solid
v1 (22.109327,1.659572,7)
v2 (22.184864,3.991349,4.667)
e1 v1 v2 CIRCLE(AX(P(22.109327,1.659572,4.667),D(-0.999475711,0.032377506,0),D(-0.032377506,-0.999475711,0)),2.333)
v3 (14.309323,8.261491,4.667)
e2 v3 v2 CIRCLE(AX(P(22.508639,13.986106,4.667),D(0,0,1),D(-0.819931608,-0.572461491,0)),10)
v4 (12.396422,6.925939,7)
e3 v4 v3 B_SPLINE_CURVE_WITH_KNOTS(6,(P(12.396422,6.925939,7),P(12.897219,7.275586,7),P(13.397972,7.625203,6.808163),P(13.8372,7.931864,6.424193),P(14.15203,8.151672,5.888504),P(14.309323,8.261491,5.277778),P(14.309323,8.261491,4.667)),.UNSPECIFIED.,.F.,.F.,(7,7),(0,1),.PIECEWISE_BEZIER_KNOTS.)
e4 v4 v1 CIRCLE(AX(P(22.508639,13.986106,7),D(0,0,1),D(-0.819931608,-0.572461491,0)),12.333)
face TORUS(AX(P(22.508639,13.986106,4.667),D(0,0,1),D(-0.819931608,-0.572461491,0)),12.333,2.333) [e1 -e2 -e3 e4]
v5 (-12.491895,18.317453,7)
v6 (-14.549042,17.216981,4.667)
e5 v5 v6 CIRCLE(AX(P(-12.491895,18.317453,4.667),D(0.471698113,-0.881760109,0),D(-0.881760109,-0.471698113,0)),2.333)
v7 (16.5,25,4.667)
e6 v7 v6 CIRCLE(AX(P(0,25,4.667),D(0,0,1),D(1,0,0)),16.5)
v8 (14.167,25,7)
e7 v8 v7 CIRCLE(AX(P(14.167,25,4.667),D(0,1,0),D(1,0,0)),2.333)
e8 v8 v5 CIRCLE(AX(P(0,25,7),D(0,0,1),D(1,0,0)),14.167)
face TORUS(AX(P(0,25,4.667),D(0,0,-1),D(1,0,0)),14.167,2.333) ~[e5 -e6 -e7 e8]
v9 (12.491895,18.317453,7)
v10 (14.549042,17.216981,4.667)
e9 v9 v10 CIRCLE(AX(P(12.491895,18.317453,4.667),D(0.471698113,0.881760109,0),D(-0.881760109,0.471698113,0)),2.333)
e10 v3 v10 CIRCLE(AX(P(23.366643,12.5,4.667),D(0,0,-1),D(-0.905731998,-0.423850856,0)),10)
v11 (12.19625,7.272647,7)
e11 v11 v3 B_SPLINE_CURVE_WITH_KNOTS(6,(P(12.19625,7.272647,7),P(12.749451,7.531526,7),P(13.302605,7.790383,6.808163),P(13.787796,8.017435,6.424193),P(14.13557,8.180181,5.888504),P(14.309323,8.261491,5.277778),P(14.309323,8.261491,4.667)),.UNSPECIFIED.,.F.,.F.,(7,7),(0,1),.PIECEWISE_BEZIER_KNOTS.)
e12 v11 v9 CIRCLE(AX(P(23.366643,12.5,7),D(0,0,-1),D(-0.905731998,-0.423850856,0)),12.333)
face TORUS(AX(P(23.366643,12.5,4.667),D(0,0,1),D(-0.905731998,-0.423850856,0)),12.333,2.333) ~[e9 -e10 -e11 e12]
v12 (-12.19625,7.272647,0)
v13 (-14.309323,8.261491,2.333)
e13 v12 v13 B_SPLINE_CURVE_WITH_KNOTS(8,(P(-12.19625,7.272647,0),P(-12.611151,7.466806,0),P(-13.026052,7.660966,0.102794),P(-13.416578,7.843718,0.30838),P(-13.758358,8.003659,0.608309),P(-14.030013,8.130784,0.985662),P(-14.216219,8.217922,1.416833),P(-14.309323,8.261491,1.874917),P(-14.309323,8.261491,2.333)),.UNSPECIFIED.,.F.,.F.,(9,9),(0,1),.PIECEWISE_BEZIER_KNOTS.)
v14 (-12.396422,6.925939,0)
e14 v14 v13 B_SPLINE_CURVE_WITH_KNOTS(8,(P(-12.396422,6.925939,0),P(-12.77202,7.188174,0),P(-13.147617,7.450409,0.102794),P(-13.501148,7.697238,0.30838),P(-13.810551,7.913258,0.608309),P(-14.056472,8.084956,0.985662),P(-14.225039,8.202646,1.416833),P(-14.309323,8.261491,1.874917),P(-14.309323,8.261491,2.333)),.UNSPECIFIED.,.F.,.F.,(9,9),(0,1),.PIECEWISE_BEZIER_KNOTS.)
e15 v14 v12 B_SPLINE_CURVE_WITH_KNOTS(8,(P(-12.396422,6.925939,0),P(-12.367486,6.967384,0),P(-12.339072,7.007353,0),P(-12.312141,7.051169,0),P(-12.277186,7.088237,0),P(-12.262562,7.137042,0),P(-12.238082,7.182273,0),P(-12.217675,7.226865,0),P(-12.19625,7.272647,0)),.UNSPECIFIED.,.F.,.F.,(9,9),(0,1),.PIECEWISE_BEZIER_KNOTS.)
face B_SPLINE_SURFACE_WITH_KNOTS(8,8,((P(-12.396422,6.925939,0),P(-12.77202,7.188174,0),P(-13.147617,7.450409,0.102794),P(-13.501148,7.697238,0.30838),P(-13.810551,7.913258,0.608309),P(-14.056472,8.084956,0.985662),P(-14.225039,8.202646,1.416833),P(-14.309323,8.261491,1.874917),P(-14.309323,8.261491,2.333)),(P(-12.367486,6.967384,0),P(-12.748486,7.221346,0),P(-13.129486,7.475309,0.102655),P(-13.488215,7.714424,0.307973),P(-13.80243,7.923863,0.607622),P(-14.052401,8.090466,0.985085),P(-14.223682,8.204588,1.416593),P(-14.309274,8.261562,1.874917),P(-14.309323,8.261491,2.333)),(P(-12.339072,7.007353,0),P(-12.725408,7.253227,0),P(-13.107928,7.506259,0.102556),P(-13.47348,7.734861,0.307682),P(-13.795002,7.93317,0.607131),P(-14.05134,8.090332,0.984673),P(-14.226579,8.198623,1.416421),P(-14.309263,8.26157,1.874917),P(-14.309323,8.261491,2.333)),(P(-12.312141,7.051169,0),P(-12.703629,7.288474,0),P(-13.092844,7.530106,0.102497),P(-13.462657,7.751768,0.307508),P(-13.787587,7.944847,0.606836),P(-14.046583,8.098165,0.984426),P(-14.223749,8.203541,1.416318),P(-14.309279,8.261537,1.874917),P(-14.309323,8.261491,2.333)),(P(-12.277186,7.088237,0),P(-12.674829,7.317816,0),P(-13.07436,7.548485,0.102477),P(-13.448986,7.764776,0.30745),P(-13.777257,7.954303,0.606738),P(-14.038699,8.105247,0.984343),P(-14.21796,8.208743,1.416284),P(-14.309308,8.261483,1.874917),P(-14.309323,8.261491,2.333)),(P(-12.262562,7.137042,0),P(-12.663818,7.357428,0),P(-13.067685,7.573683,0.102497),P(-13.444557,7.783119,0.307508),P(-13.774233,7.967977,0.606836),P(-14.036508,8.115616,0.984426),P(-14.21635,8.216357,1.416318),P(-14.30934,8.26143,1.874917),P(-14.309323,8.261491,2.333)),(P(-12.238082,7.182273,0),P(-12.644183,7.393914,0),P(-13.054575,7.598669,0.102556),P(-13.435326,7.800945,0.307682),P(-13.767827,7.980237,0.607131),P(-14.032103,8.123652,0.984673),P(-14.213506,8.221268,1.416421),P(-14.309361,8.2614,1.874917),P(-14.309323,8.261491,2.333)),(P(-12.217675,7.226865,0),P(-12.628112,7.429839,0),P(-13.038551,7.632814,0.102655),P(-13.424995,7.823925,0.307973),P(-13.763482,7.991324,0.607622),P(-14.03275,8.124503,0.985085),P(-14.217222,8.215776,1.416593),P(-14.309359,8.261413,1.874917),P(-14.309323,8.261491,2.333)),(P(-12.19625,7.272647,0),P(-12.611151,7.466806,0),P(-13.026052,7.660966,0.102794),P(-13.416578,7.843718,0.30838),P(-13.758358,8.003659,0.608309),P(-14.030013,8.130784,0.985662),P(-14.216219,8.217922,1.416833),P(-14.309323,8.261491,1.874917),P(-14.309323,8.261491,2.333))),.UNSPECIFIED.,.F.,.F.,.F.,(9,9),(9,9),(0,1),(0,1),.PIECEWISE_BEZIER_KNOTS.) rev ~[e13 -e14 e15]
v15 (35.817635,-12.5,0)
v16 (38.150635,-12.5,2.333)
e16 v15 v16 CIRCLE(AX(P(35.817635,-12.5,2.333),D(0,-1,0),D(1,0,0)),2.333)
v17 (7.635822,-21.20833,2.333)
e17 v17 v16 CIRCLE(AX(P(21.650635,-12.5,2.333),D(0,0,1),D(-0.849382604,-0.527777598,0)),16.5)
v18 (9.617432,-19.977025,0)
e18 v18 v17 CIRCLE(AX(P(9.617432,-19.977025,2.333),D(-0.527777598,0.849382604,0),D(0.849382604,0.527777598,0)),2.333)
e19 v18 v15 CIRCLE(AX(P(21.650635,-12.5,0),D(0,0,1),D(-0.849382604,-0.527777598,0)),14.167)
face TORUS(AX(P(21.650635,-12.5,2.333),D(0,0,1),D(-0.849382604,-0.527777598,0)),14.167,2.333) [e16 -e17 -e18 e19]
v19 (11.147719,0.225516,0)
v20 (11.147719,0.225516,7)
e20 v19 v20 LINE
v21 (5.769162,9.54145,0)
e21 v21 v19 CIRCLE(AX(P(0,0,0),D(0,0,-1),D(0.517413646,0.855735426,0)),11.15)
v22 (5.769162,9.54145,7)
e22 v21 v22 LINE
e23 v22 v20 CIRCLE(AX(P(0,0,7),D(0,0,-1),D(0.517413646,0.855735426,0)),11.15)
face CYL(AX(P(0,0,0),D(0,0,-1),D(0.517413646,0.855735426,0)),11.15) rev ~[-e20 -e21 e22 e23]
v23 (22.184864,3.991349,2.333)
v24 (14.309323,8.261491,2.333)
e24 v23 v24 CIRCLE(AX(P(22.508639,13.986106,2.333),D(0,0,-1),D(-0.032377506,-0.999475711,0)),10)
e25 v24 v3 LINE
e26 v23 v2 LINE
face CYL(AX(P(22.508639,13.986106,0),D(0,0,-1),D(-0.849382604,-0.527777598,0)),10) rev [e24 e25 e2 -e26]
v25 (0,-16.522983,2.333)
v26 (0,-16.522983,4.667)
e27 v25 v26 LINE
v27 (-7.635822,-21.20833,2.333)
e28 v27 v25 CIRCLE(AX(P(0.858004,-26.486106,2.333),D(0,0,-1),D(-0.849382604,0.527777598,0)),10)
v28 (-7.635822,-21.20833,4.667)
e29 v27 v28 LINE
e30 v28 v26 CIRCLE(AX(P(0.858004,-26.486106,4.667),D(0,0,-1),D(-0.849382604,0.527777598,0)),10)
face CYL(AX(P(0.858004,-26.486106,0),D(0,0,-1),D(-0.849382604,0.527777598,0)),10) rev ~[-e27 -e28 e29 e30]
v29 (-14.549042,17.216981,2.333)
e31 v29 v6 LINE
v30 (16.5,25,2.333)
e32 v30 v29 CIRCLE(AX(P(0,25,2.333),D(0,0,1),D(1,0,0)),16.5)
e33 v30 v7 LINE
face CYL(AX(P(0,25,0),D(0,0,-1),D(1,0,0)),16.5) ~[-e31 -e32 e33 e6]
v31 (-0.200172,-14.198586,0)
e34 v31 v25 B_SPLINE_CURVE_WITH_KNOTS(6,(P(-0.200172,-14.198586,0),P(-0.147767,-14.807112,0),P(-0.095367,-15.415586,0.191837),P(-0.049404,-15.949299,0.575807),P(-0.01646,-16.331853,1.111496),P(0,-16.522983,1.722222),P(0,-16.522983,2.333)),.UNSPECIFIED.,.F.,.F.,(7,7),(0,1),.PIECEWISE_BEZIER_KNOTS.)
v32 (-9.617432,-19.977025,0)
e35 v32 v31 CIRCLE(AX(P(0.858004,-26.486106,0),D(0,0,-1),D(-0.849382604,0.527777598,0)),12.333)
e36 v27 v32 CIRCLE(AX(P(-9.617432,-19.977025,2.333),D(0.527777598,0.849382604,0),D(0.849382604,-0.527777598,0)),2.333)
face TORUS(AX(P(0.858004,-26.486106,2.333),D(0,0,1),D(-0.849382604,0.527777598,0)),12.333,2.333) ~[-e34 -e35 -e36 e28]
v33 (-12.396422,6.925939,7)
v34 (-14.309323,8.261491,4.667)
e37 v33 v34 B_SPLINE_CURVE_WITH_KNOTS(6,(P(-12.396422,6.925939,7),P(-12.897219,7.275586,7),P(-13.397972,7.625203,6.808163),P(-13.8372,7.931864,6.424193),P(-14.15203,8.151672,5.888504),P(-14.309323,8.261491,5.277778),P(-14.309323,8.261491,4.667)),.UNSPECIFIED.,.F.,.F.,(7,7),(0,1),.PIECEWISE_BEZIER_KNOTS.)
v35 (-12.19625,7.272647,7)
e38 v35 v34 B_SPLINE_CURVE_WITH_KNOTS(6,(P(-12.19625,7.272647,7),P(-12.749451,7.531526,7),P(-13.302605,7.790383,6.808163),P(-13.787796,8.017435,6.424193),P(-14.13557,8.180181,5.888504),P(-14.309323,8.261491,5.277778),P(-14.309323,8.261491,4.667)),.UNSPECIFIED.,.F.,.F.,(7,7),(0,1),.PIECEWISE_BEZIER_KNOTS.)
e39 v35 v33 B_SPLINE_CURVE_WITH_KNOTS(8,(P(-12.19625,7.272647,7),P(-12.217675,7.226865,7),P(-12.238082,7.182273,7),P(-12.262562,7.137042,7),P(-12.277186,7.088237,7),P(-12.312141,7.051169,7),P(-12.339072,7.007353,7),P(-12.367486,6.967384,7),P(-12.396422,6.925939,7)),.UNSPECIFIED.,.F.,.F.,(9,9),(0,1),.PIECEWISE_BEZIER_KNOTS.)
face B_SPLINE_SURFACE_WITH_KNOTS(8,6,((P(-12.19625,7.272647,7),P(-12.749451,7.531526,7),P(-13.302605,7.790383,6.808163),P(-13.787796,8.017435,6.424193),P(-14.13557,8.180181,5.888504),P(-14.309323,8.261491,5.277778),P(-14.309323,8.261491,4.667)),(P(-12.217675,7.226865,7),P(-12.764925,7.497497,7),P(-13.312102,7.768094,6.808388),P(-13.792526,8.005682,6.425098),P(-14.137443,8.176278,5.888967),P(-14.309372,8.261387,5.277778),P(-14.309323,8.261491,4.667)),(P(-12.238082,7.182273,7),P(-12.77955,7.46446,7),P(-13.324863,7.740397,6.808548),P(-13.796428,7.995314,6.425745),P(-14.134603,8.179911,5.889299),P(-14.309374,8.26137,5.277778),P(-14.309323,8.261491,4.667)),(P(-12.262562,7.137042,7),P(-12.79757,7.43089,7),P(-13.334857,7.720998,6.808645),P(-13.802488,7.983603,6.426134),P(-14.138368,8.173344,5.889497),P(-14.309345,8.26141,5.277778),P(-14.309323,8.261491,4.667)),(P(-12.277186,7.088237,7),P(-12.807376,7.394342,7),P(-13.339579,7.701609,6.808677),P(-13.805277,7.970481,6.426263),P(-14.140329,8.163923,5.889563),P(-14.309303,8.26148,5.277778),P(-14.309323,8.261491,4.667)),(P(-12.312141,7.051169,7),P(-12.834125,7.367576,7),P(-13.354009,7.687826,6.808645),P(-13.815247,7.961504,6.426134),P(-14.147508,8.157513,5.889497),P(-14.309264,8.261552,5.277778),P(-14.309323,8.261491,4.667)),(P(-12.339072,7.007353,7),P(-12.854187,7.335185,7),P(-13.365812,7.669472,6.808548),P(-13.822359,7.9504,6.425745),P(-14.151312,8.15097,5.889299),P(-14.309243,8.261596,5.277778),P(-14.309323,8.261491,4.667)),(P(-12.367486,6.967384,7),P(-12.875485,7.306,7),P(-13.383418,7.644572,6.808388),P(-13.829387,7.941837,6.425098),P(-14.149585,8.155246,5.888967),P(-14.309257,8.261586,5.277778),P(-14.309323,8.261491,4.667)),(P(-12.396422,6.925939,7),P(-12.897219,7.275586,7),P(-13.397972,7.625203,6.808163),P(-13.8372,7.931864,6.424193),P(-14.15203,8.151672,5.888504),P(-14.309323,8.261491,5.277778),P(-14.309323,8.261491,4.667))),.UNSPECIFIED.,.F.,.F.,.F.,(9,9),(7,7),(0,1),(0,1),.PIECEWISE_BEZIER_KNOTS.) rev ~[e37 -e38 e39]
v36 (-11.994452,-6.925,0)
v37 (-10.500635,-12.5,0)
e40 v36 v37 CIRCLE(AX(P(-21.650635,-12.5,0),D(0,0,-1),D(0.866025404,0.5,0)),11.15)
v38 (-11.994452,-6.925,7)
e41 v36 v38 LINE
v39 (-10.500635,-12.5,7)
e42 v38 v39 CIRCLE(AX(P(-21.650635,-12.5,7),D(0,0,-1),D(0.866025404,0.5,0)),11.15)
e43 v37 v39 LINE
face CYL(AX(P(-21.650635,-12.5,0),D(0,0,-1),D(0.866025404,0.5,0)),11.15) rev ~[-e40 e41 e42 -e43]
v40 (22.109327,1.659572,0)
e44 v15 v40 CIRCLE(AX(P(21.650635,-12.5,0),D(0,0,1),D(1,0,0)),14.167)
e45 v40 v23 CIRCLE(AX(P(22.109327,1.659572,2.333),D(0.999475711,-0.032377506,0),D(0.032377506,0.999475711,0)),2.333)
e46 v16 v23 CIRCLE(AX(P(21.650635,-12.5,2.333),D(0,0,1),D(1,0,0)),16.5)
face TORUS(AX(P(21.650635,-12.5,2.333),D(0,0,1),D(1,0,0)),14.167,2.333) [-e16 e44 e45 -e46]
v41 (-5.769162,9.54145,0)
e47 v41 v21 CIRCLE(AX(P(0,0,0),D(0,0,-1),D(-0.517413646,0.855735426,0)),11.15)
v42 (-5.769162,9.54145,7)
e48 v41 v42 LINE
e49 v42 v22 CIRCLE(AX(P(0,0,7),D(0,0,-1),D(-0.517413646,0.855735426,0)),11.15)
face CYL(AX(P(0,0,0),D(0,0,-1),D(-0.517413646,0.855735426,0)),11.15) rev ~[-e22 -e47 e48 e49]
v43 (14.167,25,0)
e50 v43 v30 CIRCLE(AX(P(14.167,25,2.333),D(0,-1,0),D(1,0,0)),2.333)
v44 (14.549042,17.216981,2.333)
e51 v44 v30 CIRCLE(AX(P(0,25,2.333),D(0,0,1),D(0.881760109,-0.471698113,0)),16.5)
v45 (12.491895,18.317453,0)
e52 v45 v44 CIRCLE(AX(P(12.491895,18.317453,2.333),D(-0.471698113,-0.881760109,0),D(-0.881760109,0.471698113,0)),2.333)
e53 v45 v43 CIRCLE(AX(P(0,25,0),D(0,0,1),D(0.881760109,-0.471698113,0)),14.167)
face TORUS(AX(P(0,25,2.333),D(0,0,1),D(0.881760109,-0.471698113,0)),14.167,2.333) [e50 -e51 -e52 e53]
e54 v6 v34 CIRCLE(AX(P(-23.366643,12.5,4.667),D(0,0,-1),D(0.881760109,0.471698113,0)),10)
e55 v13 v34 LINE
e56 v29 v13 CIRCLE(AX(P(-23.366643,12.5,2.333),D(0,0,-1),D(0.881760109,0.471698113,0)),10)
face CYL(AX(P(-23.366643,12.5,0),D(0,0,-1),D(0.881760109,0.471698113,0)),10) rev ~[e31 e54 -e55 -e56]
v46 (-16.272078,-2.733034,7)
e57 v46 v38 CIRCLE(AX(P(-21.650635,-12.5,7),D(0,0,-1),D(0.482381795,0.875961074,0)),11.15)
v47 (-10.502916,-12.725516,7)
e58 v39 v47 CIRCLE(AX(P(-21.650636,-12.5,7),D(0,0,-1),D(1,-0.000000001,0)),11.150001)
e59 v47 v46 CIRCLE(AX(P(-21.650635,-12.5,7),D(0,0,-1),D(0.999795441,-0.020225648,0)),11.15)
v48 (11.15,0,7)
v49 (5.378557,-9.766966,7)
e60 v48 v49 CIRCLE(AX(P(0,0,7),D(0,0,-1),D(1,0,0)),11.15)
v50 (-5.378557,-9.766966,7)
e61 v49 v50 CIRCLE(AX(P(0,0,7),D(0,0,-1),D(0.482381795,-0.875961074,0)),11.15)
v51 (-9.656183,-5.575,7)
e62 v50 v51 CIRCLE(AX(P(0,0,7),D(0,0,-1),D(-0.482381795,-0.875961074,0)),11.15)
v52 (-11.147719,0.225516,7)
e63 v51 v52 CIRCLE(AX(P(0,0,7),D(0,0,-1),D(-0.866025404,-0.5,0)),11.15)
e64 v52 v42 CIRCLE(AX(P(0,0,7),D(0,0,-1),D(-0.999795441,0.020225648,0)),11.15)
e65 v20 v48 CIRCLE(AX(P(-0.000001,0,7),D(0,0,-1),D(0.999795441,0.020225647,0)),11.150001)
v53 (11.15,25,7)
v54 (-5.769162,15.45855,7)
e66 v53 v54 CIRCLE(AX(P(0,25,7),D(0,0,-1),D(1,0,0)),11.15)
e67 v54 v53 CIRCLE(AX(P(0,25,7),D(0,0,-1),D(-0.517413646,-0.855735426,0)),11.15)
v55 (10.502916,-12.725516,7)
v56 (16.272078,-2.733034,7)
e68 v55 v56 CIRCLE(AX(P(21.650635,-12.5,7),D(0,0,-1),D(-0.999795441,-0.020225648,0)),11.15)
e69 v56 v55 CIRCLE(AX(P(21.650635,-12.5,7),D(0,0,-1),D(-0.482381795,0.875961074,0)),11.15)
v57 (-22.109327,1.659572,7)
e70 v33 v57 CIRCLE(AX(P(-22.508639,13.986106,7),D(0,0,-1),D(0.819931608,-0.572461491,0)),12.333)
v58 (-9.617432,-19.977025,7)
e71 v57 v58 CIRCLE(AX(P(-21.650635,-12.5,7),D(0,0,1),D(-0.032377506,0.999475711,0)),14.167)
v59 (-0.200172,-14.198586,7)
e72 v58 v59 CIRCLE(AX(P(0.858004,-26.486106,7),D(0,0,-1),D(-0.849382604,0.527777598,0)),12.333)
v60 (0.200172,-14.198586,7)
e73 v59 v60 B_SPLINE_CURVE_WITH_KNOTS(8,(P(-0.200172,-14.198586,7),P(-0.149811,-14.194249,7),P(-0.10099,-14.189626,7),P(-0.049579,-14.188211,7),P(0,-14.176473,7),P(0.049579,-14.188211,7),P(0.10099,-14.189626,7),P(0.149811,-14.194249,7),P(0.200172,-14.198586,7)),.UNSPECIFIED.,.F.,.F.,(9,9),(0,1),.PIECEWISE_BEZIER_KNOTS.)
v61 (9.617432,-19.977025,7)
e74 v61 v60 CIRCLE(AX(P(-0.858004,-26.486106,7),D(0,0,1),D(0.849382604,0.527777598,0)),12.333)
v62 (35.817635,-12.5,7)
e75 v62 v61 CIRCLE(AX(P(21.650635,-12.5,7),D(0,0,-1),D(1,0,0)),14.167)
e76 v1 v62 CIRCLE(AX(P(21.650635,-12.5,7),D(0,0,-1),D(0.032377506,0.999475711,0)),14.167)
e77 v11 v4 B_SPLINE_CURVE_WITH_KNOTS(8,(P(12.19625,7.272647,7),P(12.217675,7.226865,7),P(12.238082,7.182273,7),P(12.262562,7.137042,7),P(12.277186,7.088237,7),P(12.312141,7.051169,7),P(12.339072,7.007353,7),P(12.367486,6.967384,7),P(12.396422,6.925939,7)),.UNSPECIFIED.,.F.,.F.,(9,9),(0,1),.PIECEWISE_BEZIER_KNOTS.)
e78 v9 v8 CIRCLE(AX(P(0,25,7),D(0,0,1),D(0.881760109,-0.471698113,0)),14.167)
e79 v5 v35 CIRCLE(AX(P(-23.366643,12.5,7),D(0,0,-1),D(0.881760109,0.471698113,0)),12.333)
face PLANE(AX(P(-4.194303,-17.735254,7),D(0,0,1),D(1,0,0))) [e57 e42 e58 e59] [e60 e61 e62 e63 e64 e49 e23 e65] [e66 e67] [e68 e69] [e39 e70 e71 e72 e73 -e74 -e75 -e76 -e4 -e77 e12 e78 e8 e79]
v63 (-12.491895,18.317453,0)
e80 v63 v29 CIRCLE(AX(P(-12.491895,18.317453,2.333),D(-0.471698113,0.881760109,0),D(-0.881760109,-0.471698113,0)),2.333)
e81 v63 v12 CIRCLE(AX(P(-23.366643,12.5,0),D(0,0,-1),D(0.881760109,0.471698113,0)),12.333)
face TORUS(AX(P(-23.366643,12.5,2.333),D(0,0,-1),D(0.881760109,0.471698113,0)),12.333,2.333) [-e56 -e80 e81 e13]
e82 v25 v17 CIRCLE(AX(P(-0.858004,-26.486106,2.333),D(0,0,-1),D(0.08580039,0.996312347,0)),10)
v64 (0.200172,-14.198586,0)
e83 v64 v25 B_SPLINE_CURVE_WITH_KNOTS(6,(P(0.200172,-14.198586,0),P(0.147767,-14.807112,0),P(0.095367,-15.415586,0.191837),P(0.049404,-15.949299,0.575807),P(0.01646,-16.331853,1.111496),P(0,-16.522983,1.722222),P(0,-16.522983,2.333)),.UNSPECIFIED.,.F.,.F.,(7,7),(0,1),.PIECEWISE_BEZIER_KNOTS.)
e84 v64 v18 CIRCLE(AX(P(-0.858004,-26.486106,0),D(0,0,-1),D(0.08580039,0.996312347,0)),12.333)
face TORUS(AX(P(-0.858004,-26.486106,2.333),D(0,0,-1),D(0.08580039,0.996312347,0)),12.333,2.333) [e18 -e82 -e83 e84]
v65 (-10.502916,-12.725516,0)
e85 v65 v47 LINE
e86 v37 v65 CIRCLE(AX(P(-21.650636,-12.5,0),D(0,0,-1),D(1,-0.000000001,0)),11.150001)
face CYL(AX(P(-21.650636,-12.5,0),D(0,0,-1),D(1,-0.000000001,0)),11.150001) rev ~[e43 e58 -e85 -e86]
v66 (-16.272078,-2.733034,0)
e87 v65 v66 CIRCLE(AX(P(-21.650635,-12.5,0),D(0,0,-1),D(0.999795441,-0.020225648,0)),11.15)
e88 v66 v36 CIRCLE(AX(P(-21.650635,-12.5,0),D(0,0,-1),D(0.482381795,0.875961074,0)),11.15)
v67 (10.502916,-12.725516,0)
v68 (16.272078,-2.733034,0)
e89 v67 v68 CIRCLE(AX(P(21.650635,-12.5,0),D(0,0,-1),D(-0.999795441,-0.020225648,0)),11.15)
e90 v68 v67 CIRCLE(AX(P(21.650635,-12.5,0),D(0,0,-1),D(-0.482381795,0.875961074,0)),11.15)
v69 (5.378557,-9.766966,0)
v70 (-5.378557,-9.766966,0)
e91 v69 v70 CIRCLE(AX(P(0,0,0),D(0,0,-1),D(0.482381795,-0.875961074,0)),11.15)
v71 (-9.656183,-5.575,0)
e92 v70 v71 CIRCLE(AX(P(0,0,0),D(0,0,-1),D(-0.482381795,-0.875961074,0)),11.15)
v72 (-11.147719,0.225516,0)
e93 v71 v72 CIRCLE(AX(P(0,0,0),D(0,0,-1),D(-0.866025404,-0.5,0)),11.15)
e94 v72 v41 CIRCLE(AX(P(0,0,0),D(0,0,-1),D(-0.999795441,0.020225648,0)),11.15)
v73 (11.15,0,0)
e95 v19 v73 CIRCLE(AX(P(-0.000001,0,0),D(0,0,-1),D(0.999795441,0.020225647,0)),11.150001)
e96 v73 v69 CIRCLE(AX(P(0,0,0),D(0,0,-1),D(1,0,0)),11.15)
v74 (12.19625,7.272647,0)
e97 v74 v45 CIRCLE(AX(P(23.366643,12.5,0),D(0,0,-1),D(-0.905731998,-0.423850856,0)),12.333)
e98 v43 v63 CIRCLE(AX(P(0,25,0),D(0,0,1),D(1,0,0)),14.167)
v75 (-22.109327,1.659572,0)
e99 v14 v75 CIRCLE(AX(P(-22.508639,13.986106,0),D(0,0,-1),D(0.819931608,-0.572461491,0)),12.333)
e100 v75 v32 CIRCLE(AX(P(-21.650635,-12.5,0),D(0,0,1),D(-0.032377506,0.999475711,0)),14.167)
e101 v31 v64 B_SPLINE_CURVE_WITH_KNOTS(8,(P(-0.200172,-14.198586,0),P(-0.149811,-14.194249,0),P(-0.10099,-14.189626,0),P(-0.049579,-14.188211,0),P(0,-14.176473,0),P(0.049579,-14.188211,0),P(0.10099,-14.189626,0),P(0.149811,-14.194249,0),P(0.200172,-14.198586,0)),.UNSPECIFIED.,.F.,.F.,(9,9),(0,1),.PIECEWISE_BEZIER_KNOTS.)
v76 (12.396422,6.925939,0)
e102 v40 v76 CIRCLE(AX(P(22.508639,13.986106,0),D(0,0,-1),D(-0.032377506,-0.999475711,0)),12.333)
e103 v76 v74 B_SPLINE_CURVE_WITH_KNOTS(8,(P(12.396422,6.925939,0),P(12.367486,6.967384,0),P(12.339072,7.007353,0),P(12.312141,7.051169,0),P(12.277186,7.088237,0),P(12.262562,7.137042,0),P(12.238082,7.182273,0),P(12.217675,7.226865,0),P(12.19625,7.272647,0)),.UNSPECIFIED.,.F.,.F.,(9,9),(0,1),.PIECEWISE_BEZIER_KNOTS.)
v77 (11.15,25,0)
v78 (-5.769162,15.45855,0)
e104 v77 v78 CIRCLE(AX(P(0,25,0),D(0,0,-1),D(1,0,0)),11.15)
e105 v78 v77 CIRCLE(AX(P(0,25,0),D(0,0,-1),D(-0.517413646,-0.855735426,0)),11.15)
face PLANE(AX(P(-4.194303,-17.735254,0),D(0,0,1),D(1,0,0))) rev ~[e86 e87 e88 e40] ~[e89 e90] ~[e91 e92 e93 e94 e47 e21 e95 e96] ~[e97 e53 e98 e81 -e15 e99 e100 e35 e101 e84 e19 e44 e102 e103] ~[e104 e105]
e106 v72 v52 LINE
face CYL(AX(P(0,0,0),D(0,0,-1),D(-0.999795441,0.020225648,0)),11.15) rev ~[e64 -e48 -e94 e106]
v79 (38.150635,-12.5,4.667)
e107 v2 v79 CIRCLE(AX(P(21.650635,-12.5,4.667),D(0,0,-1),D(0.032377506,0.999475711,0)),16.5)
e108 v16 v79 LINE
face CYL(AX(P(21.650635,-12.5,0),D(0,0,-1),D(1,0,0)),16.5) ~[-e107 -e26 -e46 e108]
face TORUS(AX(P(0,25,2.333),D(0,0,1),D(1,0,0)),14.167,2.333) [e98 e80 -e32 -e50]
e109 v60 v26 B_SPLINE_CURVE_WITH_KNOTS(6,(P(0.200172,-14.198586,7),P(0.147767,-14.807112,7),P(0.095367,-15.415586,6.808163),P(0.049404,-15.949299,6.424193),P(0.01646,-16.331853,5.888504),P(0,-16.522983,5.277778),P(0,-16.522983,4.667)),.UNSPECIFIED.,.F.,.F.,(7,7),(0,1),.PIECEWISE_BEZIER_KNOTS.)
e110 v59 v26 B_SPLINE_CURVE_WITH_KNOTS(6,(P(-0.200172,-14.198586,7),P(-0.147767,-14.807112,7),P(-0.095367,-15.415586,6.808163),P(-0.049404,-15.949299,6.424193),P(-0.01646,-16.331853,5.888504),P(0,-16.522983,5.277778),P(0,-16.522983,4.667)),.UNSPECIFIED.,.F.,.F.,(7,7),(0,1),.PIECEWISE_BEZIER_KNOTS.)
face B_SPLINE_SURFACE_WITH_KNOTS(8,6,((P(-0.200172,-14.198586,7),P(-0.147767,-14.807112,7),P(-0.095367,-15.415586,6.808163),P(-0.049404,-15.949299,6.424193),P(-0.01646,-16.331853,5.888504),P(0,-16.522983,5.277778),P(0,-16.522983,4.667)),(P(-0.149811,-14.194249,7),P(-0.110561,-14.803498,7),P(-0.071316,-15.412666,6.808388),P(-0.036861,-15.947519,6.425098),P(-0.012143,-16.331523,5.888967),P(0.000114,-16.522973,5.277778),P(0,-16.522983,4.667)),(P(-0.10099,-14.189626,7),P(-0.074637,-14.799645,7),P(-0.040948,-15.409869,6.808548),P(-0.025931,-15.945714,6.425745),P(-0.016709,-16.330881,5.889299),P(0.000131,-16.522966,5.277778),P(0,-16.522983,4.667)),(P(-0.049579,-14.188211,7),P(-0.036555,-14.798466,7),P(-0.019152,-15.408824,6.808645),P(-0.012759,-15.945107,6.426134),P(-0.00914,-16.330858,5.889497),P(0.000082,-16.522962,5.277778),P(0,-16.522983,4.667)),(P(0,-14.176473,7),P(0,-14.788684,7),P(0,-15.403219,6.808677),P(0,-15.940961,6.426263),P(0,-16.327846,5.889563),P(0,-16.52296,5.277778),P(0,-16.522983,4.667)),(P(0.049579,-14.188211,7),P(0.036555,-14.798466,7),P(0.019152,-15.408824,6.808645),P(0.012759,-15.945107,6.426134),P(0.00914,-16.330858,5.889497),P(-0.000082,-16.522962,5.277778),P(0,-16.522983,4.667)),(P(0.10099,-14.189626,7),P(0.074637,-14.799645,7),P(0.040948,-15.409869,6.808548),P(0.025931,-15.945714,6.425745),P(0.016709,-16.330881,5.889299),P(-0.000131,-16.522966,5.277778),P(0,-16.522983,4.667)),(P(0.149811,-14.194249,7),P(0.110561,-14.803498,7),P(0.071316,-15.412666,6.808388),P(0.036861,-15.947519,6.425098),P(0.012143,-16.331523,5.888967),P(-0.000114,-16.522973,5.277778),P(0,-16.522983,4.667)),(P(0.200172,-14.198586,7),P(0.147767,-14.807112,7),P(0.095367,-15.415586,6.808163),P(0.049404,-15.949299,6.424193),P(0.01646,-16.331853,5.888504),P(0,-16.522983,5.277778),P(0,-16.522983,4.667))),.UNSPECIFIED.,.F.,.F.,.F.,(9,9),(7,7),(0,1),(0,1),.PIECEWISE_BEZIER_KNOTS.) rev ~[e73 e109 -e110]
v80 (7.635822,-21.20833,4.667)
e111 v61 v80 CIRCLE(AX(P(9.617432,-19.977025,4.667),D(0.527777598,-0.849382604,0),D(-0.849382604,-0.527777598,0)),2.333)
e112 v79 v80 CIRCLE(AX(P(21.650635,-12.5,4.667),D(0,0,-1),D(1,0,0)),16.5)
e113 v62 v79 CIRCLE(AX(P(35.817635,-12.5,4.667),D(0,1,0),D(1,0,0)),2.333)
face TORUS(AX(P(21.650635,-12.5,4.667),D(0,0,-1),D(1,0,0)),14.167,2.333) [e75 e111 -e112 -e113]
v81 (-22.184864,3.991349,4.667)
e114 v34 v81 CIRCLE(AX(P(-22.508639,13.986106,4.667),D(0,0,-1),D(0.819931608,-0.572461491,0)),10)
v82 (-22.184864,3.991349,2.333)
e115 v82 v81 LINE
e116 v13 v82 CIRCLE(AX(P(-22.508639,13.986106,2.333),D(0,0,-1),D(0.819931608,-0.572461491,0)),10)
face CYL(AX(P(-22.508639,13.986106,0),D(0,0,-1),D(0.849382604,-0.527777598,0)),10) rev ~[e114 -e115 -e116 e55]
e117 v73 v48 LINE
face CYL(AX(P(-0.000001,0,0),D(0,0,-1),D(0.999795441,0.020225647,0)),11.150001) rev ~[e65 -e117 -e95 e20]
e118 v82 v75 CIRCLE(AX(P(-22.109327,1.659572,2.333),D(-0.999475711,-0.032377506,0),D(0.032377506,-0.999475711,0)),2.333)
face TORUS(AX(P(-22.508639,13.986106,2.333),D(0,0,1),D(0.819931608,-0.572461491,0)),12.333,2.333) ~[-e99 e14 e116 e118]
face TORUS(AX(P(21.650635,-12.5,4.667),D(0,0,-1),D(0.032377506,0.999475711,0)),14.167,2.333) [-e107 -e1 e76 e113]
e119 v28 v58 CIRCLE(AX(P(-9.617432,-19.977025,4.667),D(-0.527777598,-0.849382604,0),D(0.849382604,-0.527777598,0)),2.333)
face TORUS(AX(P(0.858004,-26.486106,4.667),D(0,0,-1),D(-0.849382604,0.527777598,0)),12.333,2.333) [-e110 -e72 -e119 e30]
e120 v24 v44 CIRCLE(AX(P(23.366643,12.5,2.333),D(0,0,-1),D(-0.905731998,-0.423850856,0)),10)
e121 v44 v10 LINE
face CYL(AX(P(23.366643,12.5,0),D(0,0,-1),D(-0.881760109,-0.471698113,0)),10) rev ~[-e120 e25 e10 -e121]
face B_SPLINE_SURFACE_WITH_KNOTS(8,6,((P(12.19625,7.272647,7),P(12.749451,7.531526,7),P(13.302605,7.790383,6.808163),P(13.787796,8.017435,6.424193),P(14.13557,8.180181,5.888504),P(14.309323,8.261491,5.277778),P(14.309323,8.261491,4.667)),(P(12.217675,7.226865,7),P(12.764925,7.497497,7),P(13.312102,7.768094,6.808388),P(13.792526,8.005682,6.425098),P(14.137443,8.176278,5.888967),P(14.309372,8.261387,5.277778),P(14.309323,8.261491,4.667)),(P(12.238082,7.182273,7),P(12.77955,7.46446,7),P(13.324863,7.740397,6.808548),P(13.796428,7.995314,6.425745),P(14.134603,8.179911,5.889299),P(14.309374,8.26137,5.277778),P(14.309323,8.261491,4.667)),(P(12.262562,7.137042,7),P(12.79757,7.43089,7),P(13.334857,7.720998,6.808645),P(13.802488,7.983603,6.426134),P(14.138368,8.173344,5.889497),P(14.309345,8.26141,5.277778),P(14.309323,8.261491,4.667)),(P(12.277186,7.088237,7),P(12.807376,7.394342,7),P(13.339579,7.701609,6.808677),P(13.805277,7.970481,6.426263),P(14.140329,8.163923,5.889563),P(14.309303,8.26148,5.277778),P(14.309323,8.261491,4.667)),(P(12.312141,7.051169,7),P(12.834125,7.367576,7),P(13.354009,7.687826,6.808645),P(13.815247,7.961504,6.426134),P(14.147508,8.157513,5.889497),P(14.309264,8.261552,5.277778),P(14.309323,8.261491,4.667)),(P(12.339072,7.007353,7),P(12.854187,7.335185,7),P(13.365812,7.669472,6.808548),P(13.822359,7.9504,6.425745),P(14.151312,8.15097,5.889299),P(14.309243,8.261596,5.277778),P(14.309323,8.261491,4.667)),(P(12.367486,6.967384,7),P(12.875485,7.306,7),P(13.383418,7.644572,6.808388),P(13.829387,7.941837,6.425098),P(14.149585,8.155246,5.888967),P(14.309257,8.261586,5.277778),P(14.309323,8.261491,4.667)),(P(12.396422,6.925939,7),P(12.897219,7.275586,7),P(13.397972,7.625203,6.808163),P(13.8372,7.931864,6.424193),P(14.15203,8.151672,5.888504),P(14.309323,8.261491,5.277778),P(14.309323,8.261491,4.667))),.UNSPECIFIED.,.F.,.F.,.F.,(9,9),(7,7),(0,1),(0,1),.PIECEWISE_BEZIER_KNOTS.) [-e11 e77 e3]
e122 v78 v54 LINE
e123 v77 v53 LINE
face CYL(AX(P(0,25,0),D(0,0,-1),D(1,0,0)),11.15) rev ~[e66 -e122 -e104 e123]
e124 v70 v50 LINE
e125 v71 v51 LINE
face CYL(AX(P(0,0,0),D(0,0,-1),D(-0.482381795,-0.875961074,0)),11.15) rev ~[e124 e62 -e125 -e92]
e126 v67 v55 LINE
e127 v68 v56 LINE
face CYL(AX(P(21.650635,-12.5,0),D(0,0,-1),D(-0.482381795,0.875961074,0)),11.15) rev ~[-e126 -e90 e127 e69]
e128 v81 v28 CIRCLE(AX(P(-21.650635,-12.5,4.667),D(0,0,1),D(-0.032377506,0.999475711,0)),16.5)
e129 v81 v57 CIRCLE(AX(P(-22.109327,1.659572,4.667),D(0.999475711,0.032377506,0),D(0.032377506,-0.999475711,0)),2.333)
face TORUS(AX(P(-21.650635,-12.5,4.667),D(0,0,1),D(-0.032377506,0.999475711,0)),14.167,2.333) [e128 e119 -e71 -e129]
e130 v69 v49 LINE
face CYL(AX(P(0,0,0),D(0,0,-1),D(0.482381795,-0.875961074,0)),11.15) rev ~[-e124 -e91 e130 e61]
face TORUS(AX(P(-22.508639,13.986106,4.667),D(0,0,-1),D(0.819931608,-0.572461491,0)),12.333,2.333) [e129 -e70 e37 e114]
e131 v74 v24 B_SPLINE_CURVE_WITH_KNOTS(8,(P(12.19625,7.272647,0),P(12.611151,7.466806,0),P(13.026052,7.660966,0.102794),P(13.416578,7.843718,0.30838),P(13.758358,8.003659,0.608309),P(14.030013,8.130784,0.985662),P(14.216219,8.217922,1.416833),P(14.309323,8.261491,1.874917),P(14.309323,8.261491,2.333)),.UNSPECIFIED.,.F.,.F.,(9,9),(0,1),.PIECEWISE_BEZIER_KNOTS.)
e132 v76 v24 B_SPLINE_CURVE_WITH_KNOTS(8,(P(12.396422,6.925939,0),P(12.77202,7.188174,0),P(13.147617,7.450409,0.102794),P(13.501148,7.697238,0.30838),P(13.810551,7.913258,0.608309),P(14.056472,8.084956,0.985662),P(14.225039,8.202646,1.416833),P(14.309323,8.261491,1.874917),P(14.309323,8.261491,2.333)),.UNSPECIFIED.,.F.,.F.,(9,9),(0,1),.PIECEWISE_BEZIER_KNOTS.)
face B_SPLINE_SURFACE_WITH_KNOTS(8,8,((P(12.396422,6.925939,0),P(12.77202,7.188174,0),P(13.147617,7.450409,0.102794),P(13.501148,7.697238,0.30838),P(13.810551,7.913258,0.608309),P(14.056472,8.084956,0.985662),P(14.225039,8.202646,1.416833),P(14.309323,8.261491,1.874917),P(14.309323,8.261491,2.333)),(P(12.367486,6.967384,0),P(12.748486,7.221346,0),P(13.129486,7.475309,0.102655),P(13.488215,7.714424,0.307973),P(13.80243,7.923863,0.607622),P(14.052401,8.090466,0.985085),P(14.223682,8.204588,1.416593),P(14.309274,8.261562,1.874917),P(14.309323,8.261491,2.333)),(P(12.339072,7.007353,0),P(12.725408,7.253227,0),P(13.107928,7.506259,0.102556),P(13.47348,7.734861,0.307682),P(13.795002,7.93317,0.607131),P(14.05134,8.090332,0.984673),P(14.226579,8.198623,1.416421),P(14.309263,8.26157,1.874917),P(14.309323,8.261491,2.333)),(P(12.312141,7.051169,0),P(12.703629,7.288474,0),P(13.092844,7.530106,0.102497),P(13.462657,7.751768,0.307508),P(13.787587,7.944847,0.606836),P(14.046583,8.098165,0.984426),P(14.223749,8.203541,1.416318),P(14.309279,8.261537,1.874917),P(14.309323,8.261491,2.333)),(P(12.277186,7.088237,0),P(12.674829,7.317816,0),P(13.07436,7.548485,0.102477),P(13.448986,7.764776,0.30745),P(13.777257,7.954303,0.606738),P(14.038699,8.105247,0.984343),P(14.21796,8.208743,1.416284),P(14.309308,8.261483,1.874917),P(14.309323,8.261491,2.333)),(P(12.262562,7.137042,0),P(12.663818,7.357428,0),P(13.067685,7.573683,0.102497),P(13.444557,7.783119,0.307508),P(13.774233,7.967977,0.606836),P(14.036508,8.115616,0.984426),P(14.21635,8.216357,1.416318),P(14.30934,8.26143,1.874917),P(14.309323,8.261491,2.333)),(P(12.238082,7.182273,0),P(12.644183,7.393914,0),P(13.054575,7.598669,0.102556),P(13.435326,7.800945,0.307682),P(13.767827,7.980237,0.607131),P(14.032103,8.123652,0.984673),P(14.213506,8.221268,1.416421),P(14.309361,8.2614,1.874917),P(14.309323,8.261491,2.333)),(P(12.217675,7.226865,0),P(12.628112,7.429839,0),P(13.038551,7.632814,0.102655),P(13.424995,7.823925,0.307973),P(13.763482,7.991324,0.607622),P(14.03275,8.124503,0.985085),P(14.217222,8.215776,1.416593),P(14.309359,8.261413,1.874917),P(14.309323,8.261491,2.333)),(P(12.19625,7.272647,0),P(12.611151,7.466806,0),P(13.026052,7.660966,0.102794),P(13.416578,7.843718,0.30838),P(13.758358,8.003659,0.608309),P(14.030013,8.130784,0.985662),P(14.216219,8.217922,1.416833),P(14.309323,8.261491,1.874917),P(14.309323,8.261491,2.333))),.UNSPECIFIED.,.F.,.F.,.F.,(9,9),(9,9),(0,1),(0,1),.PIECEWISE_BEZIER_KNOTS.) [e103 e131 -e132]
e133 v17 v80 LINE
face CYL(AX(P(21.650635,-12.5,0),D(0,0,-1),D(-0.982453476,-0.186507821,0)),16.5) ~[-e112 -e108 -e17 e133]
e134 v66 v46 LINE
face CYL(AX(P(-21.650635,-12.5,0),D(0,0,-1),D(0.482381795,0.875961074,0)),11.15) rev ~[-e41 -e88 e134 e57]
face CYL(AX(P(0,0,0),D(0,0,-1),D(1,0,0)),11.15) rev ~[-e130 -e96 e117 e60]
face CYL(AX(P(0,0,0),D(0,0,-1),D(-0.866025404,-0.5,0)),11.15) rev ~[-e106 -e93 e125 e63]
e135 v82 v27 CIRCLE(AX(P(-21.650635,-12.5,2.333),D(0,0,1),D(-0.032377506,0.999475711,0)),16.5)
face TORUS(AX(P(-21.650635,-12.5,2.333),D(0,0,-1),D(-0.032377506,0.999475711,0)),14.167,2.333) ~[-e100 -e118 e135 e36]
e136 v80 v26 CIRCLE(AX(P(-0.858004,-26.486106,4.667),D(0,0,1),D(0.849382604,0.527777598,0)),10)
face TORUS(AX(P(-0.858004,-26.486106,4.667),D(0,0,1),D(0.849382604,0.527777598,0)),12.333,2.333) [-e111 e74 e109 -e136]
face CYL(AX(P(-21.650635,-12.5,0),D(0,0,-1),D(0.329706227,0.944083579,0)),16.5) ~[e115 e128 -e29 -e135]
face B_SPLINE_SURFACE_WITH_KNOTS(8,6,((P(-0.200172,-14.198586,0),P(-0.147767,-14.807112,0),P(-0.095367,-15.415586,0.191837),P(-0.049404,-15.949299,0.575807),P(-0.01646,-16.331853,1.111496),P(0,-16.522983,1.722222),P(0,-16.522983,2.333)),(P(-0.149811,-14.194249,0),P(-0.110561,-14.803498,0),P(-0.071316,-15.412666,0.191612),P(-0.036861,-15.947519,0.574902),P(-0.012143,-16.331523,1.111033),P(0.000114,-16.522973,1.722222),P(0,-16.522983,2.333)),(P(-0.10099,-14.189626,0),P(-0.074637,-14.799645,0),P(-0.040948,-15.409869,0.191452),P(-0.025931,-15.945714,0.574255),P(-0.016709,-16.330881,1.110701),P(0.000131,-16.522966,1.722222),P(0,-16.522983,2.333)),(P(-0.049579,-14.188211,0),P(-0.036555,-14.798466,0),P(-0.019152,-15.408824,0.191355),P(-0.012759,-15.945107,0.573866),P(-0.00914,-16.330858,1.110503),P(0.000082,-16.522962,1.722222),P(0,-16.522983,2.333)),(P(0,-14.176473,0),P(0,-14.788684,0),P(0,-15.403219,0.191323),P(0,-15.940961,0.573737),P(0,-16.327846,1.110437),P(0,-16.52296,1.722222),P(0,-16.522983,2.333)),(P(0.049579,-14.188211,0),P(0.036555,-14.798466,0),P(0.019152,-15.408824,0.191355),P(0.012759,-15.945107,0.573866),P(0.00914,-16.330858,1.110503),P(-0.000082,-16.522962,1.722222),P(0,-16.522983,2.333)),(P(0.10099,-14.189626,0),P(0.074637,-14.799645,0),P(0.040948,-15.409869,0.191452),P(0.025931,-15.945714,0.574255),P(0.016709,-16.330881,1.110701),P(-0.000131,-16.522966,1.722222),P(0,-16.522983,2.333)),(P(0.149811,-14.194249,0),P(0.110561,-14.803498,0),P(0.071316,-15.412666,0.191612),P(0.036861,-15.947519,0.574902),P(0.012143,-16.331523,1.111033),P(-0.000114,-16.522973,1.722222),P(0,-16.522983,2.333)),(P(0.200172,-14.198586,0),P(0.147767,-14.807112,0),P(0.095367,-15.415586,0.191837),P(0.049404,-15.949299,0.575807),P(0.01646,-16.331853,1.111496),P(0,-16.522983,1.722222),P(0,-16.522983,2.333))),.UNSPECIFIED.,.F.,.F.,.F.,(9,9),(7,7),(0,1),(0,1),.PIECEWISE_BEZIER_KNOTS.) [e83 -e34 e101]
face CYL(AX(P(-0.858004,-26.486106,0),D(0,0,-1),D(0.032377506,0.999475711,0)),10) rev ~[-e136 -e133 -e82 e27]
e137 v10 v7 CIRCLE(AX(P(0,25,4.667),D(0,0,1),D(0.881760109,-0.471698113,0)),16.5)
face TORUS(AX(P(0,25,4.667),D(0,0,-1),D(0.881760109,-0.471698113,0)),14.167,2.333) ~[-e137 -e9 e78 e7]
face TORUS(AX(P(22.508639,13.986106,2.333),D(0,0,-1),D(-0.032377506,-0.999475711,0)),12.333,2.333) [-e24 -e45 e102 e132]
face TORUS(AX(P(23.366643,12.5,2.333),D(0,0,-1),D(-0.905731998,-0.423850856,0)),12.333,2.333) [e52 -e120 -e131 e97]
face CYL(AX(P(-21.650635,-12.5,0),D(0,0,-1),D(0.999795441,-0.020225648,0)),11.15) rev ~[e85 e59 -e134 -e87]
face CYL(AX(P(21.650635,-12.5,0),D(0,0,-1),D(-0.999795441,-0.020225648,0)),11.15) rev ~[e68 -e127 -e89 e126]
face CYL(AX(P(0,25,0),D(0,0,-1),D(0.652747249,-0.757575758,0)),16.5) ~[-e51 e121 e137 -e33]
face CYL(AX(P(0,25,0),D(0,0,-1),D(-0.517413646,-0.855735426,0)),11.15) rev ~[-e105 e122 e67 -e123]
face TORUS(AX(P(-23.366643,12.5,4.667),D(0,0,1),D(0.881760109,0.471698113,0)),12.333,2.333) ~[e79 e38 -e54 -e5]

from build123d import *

# Parameters (mm, degrees)
F1_DEPTH    = 7
F2_T1_DEPTH = 7
F3_R        = 2.333


# Not quite as in the source:
# - a fillet or chamfer that OpenCascade refuses, or shapes differently, is made with other operations: its cross-section is extruded or revolved along the edge and cut away or added


with BuildPart() as f1:
    # F0 (on Top) → F1 (new body)
    with BuildSketch(Plane.XY):
        with BuildLine():
            ThreePointArc((11.1477191633, 0.2255159793), (11.1494297762, 0.1127637565), (11.15, 0))
            ThreePointArc((11.15, 0), (9.5993075457, -5.6723711659), (5.3785570146, -9.7669659793))
            ThreePointArc((5.3785570146, -9.7669659793), (5.1515621474, -12.6749053564), (5.4401527402, -15.5773790531))
            ThreePointArc((5.4401527402, -15.5773790531), (8.0980639917, -14.3760689893), (10.5029159313, -12.7255159793))
            ThreePointArc((10.5029159313, -12.7255159793), (11.9944518424, -6.925), (16.27207808, -2.7330340207))
            ThreePointArc((16.27207808, -2.7330340207), (16.4429207916, -1.3712606754), (16.5, 0))
            ThreePointArc((16.5, 0), (16.4274611375, 1.5454839293), (16.2104823544, 3.0773790531))
            ThreePointArc((16.2104823544, 3.0773790531), (13.5525711029, 1.8760689893), (11.1477191633, 0.2255159793))
        make_face()
        with BuildLine():
            ThreePointArc((5.7691621487, 9.54145), (9.6561832522, 5.575), (11.1477191633, 0.2255159793))
            ThreePointArc((11.1477191633, 0.2255159793), (13.5525711029, 1.8760689893), (16.2104823544, 3.0773790531))
            ThreePointArc((16.2104823544, 3.0773790531), (14.2894191624, 8.25), (10.7703296143, 12.5))
            ThreePointArc((10.7703296143, 12.5), (8.4010089555, 10.798836367), (5.7691621487, 9.54145))
        make_face()
        with BuildLine():
            ThreePointArc((5.4401527402, -15.5773790531), (5.1515621474, -12.6749053564), (5.3785570146, -9.7669659793))
            ThreePointArc((5.3785570146, -9.7669659793), (0, -11.15), (-5.3785570146, -9.7669659793))
            ThreePointArc((-5.3785570146, -9.7669659793), (-5.207714303, -11.1287393246), (-5.1506350946, -12.5))
            ThreePointArc((-5.1506350946, -12.5), (-5.2231739571, -14.0454839293), (-5.4401527402, -15.5773790531))
            ThreePointArc((-5.4401527402, -15.5773790531), (0, -16.5), (5.4401527402, -15.5773790531))
        make_face()
        with BuildLine():
            ThreePointArc((-5.7691621487, 9.54145), (0, 11.15), (5.7691621487, 9.54145))
            ThreePointArc((5.7691621487, 9.54145), (8.4010089555, 10.798836367), (10.7703296143, 12.5))
            ThreePointArc((10.7703296143, 12.5), (8.4010089555, 14.201163633), (5.7691621487, 15.45855))
            ThreePointArc((5.7691621487, 15.45855), (0, 13.85), (-5.7691621487, 15.45855))
            ThreePointArc((-5.7691621487, 15.45855), (-8.4010089555, 14.201163633), (-10.7703296143, 12.5))
            ThreePointArc((-10.7703296143, 12.5), (-8.4010089555, 10.798836367), (-5.7691621487, 9.54145))
        make_face()
        with BuildLine():
            ThreePointArc((38.1506350946, -12.5), (31.2027940073, 0.9538567001), (16.2104823544, 3.0773790531))
            ThreePointArc((16.2104823544, 3.0773790531), (16.4274611375, 1.5454839293), (16.5, 0))
            ThreePointArc((16.5, 0), (16.4429207916, -1.3712606754), (16.27207808, -2.7330340207))
            ThreePointArc((16.27207808, -2.7330340207), (27.3230062605, -2.9006924543), (32.8006350946, -12.5))
            ThreePointArc((32.8006350946, -12.5), (21.7633988511, -23.6494297762), (10.5029159313, -12.7255159793))
            ThreePointArc((10.5029159313, -12.7255159793), (8.0980639917, -14.3760689893), (5.4401527402, -15.5773790531))
            ThreePointArc((5.4401527402, -15.5773790531), (23.196119024, -28.9274611375), (38.1506350946, -12.5))
        make_face()
        with BuildLine():
            ThreePointArc((-5.1506350946, -12.5), (-5.207714303, -11.1287393246), (-5.3785570146, -9.7669659793))
            ThreePointArc((-5.3785570146, -9.7669659793), (-7.8041013842, -7.963573418), (-9.6561832522, -5.575))
            Line((-9.6561832522, -5.575), (-11.9944518424, -6.925))
            ThreePointArc((-11.9944518424, -6.925), (-10.8805621315, -9.6141676471), (-10.5006350946, -12.5))
            ThreePointArc((-10.5006350946, -12.5), (-10.5012053184, -12.6127637565), (-10.5029159313, -12.7255159793))
            ThreePointArc((-10.5029159313, -12.7255159793), (-8.0980639917, -14.3760689893), (-5.4401527402, -15.5773790531))
            ThreePointArc((-5.4401527402, -15.5773790531), (-5.2231739571, -14.0454839293), (-5.1506350946, -12.5))
        make_face()
        with BuildLine():
            ThreePointArc((-11.1477191633, 0.2255159793), (-9.6561832522, 5.575), (-5.7691621487, 9.54145))
            ThreePointArc((-5.7691621487, 9.54145), (-8.4010089555, 10.798836367), (-10.7703296143, 12.5))
            ThreePointArc((-10.7703296143, 12.5), (-14.2894191624, 8.25), (-16.2104823544, 3.0773790531))
            ThreePointArc((-16.2104823544, 3.0773790531), (-13.5525711029, 1.8760689893), (-11.1477191633, 0.2255159793))
        make_face()
        with BuildLine():
            ThreePointArc((5.7691621487, 15.45855), (8.4010089555, 14.201163633), (10.7703296143, 12.5))
            ThreePointArc((10.7703296143, 12.5), (14.9993406294, 18.1246977752), (16.5, 25))
            ThreePointArc((16.5, 25), (-6.8753022248, 39.9993406294), (-10.7703296143, 12.5))
            ThreePointArc((-10.7703296143, 12.5), (-8.4010089555, 14.201163633), (-5.7691621487, 15.45855))
            ThreePointArc((-5.7691621487, 15.45855), (-5.4770586104, 34.7120713022), (11.15, 25))
            ThreePointArc((11.15, 25), (9.7120713022, 19.5229413896), (5.7691621487, 15.45855))
        make_face()
        with BuildLine():
            Line((-11.9944518424, -6.925), (-9.6561832522, -5.575))
            ThreePointArc((-9.6561832522, -5.575), (-10.798707577, -2.7767633434), (-11.1477191633, 0.2255159793))
            ThreePointArc((-11.1477191633, 0.2255159793), (-13.5525711029, 1.8760689893), (-16.2104823544, 3.0773790531))
            ThreePointArc((-16.2104823544, 3.0773790531), (-16.4990729472, 0.1749053564), (-16.27207808, -2.7330340207))
            ThreePointArc((-16.27207808, -2.7330340207), (-13.8465337104, -4.536426582), (-11.9944518424, -6.925))
        make_face()
        with BuildLine():
            ThreePointArc((-16.2104823544, 3.0773790531), (-35.9400542571, -20.75), (-5.4401527402, -15.5773790531))
            ThreePointArc((-5.4401527402, -15.5773790531), (-8.0980639917, -14.3760689893), (-10.5029159313, -12.7255159793))
            ThreePointArc((-10.5029159313, -12.7255159793), (-31.3068183468, -18.075), (-16.27207808, -2.7330340207))
            ThreePointArc((-16.27207808, -2.7330340207), (-16.4990729472, 0.1749053564), (-16.2104823544, 3.0773790531))
        make_face()
    extrude(amount=F1_DEPTH)

    # F2: fillet of radius 10 on 6 edges, made by hand

    # F2_s2 → F2_t1 (join)
    with BuildSketch(Plane.XY):
        with BuildLine():
            ThreePointArc((-7.6358221368, -21.2083303657), (-4.1419961018, -17.825852307), (0.5342288423, -16.4913492336))
            ThreePointArc((0.5342288423, -16.4913492336), (-2.4951668673, -16.3102465433), (-5.4401527402, -15.5773790531))
            ThreePointArc((-5.4401527402, -15.5773790531), (-6.2779638124, -18.4942453779), (-7.6358221368, -21.2083303657))
        make_face()
        with BuildLine():
            ThreePointArc((-14.5490418001, 17.2169811321), (-13.3666428911, 12.5), (-14.5490418001, 7.7830188679))
            ThreePointArc((-14.5490418001, 7.7830188679), (-12.8775044149, 10.3160011654), (-10.7703296143, 12.5))
            ThreePointArc((-10.7703296143, 12.5), (-12.8775044149, 14.6839988346), (-14.5490418001, 17.2169811321))
        make_face()
        with BuildLine():
            ThreePointArc((14.5490418001, 7.7830188679), (13.3666428911, 12.5), (14.5490418001, 17.2169811321))
            ThreePointArc((14.5490418001, 17.2169811321), (12.8775044149, 14.6839988346), (10.7703296143, 12.5))
            ThreePointArc((10.7703296143, 12.5), (12.8775044149, 10.3160011654), (14.5490418001, 7.7830188679))
        make_face()
        with BuildLine():
            ThreePointArc((-0.5342288423, -16.4913492336), (4.1419961018, -17.825852307), (7.6358221368, -21.2083303657))
            ThreePointArc((7.6358221368, -21.2083303657), (6.2779638124, -18.4942453779), (5.4401527402, -15.5773790531))
            ThreePointArc((5.4401527402, -15.5773790531), (2.4951668673, -16.3102465433), (-0.5342288423, -16.4913492336))
        make_face()
        with BuildLine():
            ThreePointArc((14.0148129578, 8.7083303657), (17.5086389929, 5.325852307), (22.1848639369, 3.9913492336))
            ThreePointArc((22.1848639369, 3.9913492336), (19.1554682273, 3.8102465433), (16.2104823544, 3.0773790531))
            ThreePointArc((16.2104823544, 3.0773790531), (15.3726712822, 5.9942453779), (14.0148129578, 8.7083303657))
        make_face()
        with BuildLine():
            ThreePointArc((-14.0148129578, 8.7083303657), (-17.5086389929, 5.325852307), (-22.1848639369, 3.9913492336))
            ThreePointArc((-22.1848639369, 3.9913492336), (-19.1554682273, 3.8102465433), (-16.2104823544, 3.0773790531))
            ThreePointArc((-16.2104823544, 3.0773790531), (-15.3726712822, 5.9942453779), (-14.0148129578, 8.7083303657))
        make_face()
    extrude(amount=F2_T1_DEPTH)

    # F3 (call 1 of 2: OpenCascade refuses the feature's edges together)
    f3_edges = [f1.edges().sort_by_distance(p)[0] for p in [
        (0, 41.5, 7),
        (-13.370224, 12.767582, 7),
        (-4.371939, -17.962744, 7),
        (-35.940054, -20.75, 7),
        (17.742162, 5.195162, 7),
        (35.940054, -20.75, 7),
        (-17.742162, 5.195162, 7),
        (4.371939, -17.962744, 7),
        (13.370224, 12.767582, 7),
    ]]
    fillet(f3_edges, radius=F3_R)

    # F3#2 (call 2 of 2)
    f3_2_edges = [f1.edges().sort_by_distance(p)[0] for p in [
        (-35.940054, -20.75, 0),
        (-17.742162, 5.195162, 0),
        (35.940054, -20.75, 0),
        (4.371939, -17.962744, 0),
        (13.370224, 12.767582, 0),
        (0, 41.5, 0),
        (-13.370224, 12.767582, 0),
        (-4.371939, -17.962744, 0),
        (17.742162, 5.195162, 0),
    ]]
    fillet(f3_2_edges, radius=F3_R)


solid = f1.part
